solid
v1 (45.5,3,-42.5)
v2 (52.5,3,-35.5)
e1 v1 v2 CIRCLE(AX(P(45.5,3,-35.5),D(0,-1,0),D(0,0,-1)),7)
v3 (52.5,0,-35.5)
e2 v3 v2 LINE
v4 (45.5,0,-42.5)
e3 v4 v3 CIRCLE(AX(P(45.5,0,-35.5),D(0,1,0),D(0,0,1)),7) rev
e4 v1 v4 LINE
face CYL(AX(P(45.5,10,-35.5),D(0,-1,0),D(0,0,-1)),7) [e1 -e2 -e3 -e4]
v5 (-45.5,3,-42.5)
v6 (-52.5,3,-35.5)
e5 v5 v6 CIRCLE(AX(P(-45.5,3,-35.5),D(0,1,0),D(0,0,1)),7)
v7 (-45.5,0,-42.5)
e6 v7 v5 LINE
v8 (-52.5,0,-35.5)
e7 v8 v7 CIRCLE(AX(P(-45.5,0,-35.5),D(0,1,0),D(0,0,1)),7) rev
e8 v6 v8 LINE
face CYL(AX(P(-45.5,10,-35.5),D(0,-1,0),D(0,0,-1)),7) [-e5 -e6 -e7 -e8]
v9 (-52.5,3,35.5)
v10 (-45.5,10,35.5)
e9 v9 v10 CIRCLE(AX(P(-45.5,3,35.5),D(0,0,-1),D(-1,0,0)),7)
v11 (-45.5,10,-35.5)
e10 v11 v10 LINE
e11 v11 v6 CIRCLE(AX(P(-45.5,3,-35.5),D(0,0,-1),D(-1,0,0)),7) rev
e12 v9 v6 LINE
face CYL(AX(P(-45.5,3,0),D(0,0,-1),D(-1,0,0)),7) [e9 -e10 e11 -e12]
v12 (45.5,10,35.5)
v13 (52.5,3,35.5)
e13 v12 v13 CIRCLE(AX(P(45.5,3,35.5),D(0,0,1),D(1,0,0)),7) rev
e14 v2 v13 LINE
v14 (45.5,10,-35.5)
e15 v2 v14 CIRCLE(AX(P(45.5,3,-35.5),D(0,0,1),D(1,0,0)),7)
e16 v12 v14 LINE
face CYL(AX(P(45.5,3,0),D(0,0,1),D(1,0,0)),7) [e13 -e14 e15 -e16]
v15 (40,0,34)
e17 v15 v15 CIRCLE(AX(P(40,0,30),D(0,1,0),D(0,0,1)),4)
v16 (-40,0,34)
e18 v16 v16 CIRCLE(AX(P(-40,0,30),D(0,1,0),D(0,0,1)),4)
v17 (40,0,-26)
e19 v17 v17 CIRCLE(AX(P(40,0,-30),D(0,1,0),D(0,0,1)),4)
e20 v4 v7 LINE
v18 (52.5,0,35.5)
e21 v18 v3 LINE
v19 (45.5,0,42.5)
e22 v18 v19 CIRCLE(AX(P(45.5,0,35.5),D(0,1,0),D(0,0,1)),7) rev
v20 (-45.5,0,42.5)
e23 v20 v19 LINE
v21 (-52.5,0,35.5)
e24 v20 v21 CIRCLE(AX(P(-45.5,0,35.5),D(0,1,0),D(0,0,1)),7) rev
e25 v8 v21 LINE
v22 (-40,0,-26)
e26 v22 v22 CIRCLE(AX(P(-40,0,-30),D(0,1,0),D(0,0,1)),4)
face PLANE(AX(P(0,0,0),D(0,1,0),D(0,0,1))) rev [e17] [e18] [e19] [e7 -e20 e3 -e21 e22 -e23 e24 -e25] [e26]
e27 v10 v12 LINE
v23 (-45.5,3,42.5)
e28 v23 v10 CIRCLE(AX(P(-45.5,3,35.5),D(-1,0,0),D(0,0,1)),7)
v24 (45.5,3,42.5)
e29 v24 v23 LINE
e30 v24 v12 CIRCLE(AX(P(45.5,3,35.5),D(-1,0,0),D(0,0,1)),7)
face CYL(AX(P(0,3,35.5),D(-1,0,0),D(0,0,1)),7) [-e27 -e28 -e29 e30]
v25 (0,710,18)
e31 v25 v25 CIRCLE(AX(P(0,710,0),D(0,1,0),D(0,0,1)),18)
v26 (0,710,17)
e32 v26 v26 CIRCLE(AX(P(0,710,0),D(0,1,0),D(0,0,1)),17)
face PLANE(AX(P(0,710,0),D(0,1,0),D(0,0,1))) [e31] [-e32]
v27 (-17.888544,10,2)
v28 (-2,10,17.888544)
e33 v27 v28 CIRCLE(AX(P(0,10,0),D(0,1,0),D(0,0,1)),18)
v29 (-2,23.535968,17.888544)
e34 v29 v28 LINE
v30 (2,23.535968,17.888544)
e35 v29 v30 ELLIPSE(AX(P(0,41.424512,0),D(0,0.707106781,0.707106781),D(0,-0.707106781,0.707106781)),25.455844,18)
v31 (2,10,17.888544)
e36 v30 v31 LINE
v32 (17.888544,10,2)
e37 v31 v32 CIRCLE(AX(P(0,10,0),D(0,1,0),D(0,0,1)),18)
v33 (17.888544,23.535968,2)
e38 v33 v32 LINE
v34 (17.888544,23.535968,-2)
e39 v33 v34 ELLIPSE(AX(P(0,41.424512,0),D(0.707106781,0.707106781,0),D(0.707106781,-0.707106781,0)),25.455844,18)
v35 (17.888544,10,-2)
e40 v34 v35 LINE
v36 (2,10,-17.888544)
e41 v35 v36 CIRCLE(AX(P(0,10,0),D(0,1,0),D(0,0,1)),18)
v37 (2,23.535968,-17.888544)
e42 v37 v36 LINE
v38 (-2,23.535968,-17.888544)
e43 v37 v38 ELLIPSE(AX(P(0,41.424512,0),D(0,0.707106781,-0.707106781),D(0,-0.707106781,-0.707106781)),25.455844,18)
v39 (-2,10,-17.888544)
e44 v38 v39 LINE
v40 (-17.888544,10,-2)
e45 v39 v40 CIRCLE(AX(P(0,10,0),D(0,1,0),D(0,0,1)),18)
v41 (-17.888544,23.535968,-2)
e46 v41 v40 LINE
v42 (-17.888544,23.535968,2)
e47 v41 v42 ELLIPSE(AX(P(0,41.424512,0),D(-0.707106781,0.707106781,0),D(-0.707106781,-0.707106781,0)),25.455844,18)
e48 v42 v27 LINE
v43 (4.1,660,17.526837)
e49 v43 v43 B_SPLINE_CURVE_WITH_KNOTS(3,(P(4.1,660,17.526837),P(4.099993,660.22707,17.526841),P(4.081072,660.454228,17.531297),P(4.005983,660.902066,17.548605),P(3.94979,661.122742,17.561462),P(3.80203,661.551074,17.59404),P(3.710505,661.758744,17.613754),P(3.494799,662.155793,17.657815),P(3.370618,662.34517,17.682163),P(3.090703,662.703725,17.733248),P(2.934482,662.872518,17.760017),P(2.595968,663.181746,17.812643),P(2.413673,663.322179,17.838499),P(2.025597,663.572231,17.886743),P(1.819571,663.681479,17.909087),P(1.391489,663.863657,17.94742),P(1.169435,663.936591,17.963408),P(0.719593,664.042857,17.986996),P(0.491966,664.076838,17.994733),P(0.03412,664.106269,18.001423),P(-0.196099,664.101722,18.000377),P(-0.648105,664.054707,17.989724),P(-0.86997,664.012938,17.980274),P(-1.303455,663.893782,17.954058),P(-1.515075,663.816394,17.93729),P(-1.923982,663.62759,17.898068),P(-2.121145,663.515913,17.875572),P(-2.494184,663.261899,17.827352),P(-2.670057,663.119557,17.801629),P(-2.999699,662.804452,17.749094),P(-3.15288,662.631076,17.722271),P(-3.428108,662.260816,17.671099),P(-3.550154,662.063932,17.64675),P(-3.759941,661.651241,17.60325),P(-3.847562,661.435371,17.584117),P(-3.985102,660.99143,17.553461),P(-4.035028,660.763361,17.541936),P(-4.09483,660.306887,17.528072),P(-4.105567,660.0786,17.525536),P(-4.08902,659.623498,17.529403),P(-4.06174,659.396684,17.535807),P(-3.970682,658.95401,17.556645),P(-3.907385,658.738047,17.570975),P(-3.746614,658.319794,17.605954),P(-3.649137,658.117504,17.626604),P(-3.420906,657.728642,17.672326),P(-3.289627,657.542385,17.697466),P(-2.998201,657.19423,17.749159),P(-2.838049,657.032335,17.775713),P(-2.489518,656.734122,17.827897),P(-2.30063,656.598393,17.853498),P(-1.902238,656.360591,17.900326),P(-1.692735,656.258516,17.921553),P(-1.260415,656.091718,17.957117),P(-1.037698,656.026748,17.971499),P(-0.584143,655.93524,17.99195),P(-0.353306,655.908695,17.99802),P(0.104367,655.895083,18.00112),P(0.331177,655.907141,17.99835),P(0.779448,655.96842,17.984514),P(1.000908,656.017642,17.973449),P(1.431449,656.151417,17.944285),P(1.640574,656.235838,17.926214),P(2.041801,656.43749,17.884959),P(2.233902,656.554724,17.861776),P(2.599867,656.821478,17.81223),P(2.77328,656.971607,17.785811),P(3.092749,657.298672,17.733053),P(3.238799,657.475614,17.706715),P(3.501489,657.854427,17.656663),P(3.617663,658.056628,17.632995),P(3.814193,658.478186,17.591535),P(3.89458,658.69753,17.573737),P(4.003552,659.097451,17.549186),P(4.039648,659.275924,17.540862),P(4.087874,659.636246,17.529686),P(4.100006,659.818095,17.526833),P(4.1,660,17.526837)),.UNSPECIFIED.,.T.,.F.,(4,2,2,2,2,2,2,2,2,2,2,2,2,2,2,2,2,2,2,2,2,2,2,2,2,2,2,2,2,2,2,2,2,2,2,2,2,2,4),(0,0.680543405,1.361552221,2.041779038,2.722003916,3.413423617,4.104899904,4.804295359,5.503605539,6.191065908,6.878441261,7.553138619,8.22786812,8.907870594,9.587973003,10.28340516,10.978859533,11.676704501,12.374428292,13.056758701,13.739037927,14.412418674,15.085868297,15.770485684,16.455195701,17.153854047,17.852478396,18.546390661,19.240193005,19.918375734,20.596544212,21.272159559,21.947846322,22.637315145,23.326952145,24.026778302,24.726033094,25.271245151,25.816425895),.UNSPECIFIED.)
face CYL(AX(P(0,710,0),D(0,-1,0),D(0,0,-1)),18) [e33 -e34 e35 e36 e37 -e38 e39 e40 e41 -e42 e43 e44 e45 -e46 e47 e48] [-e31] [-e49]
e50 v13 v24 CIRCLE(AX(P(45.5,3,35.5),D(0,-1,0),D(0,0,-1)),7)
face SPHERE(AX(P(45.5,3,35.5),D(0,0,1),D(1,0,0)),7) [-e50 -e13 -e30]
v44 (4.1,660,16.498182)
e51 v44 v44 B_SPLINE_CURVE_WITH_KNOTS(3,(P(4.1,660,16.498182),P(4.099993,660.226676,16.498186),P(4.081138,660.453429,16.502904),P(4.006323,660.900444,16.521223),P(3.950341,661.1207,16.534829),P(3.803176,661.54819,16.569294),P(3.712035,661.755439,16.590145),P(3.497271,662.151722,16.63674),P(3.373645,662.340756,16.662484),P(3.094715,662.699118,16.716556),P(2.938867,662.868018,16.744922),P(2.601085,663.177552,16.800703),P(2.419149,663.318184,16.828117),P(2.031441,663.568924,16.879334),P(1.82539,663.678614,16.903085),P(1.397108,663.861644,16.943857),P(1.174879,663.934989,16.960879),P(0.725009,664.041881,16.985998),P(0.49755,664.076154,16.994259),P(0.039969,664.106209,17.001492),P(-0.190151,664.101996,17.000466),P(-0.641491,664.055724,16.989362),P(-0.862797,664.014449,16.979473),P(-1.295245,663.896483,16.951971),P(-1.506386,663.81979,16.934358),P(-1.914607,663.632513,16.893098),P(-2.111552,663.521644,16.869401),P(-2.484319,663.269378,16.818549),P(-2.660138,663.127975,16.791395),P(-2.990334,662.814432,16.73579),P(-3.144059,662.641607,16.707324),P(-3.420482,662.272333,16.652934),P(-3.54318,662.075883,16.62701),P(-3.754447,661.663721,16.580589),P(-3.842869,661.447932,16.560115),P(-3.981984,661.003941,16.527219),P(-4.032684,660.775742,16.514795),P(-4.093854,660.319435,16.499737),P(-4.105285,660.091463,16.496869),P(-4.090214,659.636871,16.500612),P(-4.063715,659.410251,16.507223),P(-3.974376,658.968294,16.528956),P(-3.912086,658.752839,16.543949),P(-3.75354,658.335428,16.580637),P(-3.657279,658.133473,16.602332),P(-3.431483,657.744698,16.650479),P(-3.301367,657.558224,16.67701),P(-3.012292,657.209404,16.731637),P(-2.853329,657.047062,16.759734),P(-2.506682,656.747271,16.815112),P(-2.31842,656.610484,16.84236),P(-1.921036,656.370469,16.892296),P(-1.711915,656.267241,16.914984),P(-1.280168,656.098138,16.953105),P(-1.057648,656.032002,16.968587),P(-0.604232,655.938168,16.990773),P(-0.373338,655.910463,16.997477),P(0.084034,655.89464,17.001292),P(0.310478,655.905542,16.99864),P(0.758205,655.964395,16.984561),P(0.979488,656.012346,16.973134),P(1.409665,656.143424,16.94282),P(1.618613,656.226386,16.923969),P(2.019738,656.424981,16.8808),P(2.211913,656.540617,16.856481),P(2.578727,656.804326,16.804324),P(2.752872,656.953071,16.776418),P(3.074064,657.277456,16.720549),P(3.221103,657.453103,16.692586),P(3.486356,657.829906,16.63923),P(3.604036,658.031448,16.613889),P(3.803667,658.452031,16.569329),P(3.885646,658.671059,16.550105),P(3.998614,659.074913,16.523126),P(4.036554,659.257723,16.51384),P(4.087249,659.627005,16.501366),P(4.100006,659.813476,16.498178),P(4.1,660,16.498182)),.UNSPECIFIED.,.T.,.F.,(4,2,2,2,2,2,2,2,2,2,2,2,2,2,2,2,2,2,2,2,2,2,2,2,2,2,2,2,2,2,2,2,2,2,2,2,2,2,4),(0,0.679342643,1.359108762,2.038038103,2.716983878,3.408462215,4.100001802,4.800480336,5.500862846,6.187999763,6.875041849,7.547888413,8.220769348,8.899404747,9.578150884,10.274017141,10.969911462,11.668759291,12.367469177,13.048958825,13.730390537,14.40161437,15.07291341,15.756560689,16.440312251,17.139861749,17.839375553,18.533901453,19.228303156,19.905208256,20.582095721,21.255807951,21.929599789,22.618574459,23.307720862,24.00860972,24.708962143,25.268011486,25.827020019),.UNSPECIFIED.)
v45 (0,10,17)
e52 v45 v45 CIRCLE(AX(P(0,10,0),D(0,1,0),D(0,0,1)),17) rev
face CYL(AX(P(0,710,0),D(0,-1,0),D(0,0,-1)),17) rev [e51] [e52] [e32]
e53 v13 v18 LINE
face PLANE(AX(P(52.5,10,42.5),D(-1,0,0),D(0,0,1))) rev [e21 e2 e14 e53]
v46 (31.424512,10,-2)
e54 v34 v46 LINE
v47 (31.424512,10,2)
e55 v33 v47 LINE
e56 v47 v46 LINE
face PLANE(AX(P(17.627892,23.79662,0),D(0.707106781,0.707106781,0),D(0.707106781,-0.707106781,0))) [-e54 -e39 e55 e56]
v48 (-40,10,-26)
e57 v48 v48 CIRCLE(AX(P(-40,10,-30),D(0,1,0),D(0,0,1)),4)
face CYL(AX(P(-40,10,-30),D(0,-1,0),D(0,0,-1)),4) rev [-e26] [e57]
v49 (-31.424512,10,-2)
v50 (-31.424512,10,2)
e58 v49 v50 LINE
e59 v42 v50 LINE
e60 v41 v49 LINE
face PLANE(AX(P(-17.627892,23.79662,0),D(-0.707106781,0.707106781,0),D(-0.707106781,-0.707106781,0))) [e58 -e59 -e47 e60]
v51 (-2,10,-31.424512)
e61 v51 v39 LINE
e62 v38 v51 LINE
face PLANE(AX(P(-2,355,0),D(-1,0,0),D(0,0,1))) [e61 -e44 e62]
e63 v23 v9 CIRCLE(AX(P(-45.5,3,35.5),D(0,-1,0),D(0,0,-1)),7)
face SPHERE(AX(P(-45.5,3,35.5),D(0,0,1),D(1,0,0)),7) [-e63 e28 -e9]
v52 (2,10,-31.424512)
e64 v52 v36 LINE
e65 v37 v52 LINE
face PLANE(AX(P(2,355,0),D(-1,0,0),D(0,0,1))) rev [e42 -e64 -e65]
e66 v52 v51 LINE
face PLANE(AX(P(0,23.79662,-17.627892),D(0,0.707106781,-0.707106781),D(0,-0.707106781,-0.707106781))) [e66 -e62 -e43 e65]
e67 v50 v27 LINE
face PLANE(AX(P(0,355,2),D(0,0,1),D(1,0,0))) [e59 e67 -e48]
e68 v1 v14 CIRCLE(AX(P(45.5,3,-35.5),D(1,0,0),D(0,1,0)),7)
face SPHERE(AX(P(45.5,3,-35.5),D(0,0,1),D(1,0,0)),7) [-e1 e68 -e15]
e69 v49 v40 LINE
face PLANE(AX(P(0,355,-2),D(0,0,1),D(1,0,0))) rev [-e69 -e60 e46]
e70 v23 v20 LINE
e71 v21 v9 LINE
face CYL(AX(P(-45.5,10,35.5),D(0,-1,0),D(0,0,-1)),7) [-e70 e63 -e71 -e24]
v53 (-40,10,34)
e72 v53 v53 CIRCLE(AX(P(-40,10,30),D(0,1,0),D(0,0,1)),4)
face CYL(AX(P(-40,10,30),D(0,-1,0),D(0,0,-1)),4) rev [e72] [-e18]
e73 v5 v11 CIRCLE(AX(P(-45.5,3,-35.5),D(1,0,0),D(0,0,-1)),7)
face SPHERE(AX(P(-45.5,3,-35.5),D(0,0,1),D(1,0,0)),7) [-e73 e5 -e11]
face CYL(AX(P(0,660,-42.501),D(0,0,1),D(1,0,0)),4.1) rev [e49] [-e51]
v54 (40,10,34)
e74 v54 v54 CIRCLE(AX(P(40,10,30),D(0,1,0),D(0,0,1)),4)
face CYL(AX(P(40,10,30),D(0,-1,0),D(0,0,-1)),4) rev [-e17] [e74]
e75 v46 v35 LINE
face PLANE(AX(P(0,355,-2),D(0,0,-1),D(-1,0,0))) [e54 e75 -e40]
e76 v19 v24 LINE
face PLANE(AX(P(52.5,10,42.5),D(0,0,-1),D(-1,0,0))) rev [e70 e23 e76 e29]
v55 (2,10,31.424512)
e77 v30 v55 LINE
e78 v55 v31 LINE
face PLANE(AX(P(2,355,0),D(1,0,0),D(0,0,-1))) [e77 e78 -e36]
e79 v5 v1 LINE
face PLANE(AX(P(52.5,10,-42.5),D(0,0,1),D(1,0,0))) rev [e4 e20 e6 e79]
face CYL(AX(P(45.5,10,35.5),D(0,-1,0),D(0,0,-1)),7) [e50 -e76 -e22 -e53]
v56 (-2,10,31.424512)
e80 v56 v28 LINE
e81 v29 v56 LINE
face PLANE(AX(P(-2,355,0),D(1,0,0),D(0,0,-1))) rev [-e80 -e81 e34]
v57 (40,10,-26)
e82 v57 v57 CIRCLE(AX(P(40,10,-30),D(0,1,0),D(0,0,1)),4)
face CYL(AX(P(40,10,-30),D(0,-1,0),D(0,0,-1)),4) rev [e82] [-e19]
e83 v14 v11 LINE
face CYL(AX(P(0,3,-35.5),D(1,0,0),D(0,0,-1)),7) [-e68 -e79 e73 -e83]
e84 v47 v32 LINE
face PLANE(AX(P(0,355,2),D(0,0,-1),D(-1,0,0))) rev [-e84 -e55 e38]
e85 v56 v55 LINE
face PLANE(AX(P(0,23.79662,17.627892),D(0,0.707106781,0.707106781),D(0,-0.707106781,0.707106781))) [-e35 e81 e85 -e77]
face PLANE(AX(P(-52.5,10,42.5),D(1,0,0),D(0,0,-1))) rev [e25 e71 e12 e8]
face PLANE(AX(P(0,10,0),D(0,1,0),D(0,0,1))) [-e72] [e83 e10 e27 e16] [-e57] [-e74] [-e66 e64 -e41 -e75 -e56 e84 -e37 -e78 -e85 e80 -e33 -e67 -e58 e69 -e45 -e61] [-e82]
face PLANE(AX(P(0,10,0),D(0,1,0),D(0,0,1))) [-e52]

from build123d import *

# Parameters (mm, degrees)
SKETCH1_W               = 105
SKETCH1_H               = 85
SKETCH1_R               = 4
BOSS_EXTRUDE1_DEPTH     = 10
FILLET1_R               = 7
FILLET2_R               = 7
SKETCH17_R              = 18
SKETCH17_R_2            = 17
BOSS_EXTRUDE2_DEPTH     = 700
RIB2_REACH              = 715.206
SKETCH18_WALL_W         = 1447.913707502
SKETCH18_WALL_H         = 4
CIRPATTERN1_COUNT       = 4
CUT_EXTRUDE1_REACH      = 716.504
CUT_EXTRUDE1_END_RADIUS = 17
SKETCH19_R              = 4.1


with BuildPart() as part:
    # Sketch1 → Boss-Extrude1 (new body)
    with BuildSketch(Plane(origin=(0, 0, 0), x_dir=(1, 0, 0), z_dir=(0, 1, 0))):
        Rectangle(SKETCH1_W, SKETCH1_H)
        with Locations(Location((-40, -30, 0), (0, 0, 270))):
            Circle(SKETCH1_R, mode=Mode.SUBTRACT)
        with Locations(Location((40, 30, 0), (0, 0, 270))):
            Circle(SKETCH1_R, mode=Mode.SUBTRACT)
        with Locations(Location((40, -30, 0), (0, 0, 270))):
            Circle(SKETCH1_R, mode=Mode.SUBTRACT)
        with Locations(Location((-40, 30, 0), (0, 0, 270))):
            Circle(SKETCH1_R, mode=Mode.SUBTRACT)
    extrude(amount=BOSS_EXTRUDE1_DEPTH)

    # Fillet1
    fillet1_edges = [part.edges().sort_by_distance(p)[0] for p in [
        (52.5, 10, 0),
        (-52.5, 10, 0),
        (52.5, 5, 42.5),
        (-52.5, 5, 42.5),
    ]]
    fillet(fillet1_edges, radius=FILLET1_R)

    # Fillet2
    # the kernel refuses this fillet: 7 mm, written as the material it takes off along each edge
    with BuildSketch(Plane(origin=(45.5, 3, 35.5), x_dir=(0, 1, 0), z_dir=(0, 0, 1))) as fillet2_piece_1_section:
        Polygon((0, 0), (FILLET2_R, 0), (FILLET2_R, -FILLET2_R), (0, -FILLET2_R), align=None)
    fillet2_piece_1 = extrude(amount=FILLET2_R, mode=Mode.PRIVATE)
    fillet2_piece_1 = fillet2_piece_1 - Plane(origin=(45.5, 3, 35.5), x_dir=(-0.7071067811865475, -0.7071067811865475, 0), z_dir=(0, 0, 1)) * Sphere(FILLET2_R, mode=Mode.PRIVATE)
    add(fillet2_piece_1, mode=Mode.SUBTRACT)
    with BuildSketch(Plane(origin=(-45.5, 3, 35.5), x_dir=(0, 1, 0), z_dir=(0, 0, 1))) as fillet2_piece_2_section:
        Polygon((0, 0), (FILLET2_R, 0), (FILLET2_R, FILLET2_R), (0, FILLET2_R), align=None)
    fillet2_piece_2 = extrude(amount=FILLET2_R, mode=Mode.PRIVATE)
    fillet2_piece_2 = fillet2_piece_2 - Plane(origin=(-45.5, 3, 35.5), x_dir=(0.7071067811865475, -0.7071067811865475, 0), z_dir=(0, 0, 1)) * Sphere(FILLET2_R, mode=Mode.PRIVATE)
    add(fillet2_piece_2, mode=Mode.SUBTRACT)
    with BuildSketch(Plane(origin=(45.5, 10, 42.5), x_dir=(0, -1, 0), z_dir=(-1, 0, 0))) as fillet2_piece_3:
        with BuildLine():
            CenterArc((FILLET2_R, -FILLET2_R), FILLET2_R, 90, 90)
            Line((0, -FILLET2_R), (0, 0))
            Line((0, 0), (FILLET2_R, 0))
        make_face()
    extrude(amount=91, mode=Mode.SUBTRACT)
    with BuildSketch(Plane(origin=(-45.5, 10, -42.5), x_dir=(0, 0, 1), z_dir=(1, 0, 0))) as fillet2_piece_4:
        with BuildLine():
            CenterArc((FILLET2_R, FILLET2_R), FILLET2_R, 180, 90)
            Line((0, FILLET2_R), (0, 0))
            Line((0, 0), (FILLET2_R, 0))
        make_face()
    extrude(amount=91, mode=Mode.SUBTRACT)
    with BuildSketch(Plane(origin=(-52.5, -17.5, -42.5), x_dir=(0, 0, 1), z_dir=(0, 1, 0))) as fillet2_piece_5:
        with BuildLine():
            CenterArc((FILLET2_R, FILLET2_R), FILLET2_R, 180, 90)
            Line((0, FILLET2_R), (0, 0))
            Line((0, 0), (FILLET2_R, 0))
        make_face()
    extrude(amount=20.5, mode=Mode.SUBTRACT)
    with BuildSketch(Plane(origin=(52.5, -17.5, -42.5), x_dir=(0, 0, 1), z_dir=(0, 1, 0))) as fillet2_piece_6:
        with BuildLine():
            CenterArc((FILLET2_R, -FILLET2_R), FILLET2_R, 90, 90)
            Line((0, -FILLET2_R), (0, 0))
            Line((0, 0), (FILLET2_R, 0))
        make_face()
    extrude(amount=20.5, mode=Mode.SUBTRACT)
    with BuildSketch(Plane(origin=(-45.5, 3, -42.5), x_dir=(-1, 0, 0), z_dir=(0, -1, 0))) as fillet2_piece_7:
        with BuildLine():
            CenterArc((7 - FILLET2_R, -FILLET2_R), FILLET2_R, 0, 90)
            Line((7, -FILLET2_R), (7, 0))
            Line((7, 0), (7 - FILLET2_R, 0))
        make_face()
    revolve(axis=Axis((-45.5, 3, -42.5), (0, 0, -1)), revolution_arc=90, mode=Mode.SUBTRACT)
    with BuildSketch(Plane(origin=(45.5, 3, -42.5), x_dir=(1, 0, 0), z_dir=(0, -1, 0))) as fillet2_piece_8:
        with BuildLine():
            CenterArc((7 - FILLET2_R, FILLET2_R), FILLET2_R, 270, 90)
            Line((7, FILLET2_R), (7, 0))
            Line((7, 0), (7 - FILLET2_R, 0))
        make_face()
    revolve(axis=Axis((45.5, 3, -42.5), (0, 0, 1)), revolution_arc=90, mode=Mode.SUBTRACT)

    # Sketch17 → Boss-Extrude2 (add)
    with BuildSketch(Plane(origin=(0, 10, 0), x_dir=(1, 0, 0), z_dir=(0, 1, 0))):
        with Locations(Location((0, 0, 0), (0, 0, 270))):
            Circle(SKETCH17_R)
        with Locations(Location((0, 0, 0), (0, 0, 270))):
            Circle(SKETCH17_R_2, mode=Mode.SUBTRACT)
    extrude(amount=BOSS_EXTRUDE2_DEPTH)

    # Sketch18 wall → Rib2 (add, up to next)
    with BuildSketch(Plane(origin=(-24.522935069, 16.901577145, 0), x_dir=(-0.707106781187, -0.707106781187, 0), z_dir=(0.707106781187, -0.707106781187, 0)), mode=Mode.PRIVATE) as rib2_sk1:
        Rectangle(SKETCH18_WALL_W, SKETCH18_WALL_H)
    rib2_tool1 = extrude(rib2_sk1.sketch, amount=RIB2_REACH, mode=Mode.PRIVATE) - part.part
    rib2 = rib2_tool1.solids().sort_by_distance((-24.522935069, 16.901577145, 0))[0]
    add(rib2)

    # CirPattern1: Rib2 ×4 about axis
    cirpattern1_axis = Axis((0, 0, 0), (0, 1, 0))
    for i in range(1, CIRPATTERN1_COUNT):
        add(rib2.rotate(cirpattern1_axis, i * 360 / CIRPATTERN1_COUNT))

    # Cut-Extrude1: up to this cylinder (the profile starts outside it)
    cut_extrude1_end = Plane(origin=(0, 660, 0), z_dir=(0, -1, 0)) * Cylinder(CUT_EXTRUDE1_END_RADIUS, 1468.008, mode=Mode.PRIVATE)
    # Sketch19 → Cut-Extrude1 (cut, up to the surface)
    with BuildSketch(Plane.XY.offset(18), mode=Mode.PRIVATE) as cut_extrude1_sk1:
        with Locations((0, 660)):
            Circle(SKETCH19_R)
    cut_extrude1_tool1 = extrude(cut_extrude1_sk1.sketch, amount=-CUT_EXTRUDE1_REACH, mode=Mode.PRIVATE) - cut_extrude1_end
    add(cut_extrude1_tool1.solids().sort_by_distance((0, 660, 18))[0], mode=Mode.SUBTRACT)


solid = part.part
